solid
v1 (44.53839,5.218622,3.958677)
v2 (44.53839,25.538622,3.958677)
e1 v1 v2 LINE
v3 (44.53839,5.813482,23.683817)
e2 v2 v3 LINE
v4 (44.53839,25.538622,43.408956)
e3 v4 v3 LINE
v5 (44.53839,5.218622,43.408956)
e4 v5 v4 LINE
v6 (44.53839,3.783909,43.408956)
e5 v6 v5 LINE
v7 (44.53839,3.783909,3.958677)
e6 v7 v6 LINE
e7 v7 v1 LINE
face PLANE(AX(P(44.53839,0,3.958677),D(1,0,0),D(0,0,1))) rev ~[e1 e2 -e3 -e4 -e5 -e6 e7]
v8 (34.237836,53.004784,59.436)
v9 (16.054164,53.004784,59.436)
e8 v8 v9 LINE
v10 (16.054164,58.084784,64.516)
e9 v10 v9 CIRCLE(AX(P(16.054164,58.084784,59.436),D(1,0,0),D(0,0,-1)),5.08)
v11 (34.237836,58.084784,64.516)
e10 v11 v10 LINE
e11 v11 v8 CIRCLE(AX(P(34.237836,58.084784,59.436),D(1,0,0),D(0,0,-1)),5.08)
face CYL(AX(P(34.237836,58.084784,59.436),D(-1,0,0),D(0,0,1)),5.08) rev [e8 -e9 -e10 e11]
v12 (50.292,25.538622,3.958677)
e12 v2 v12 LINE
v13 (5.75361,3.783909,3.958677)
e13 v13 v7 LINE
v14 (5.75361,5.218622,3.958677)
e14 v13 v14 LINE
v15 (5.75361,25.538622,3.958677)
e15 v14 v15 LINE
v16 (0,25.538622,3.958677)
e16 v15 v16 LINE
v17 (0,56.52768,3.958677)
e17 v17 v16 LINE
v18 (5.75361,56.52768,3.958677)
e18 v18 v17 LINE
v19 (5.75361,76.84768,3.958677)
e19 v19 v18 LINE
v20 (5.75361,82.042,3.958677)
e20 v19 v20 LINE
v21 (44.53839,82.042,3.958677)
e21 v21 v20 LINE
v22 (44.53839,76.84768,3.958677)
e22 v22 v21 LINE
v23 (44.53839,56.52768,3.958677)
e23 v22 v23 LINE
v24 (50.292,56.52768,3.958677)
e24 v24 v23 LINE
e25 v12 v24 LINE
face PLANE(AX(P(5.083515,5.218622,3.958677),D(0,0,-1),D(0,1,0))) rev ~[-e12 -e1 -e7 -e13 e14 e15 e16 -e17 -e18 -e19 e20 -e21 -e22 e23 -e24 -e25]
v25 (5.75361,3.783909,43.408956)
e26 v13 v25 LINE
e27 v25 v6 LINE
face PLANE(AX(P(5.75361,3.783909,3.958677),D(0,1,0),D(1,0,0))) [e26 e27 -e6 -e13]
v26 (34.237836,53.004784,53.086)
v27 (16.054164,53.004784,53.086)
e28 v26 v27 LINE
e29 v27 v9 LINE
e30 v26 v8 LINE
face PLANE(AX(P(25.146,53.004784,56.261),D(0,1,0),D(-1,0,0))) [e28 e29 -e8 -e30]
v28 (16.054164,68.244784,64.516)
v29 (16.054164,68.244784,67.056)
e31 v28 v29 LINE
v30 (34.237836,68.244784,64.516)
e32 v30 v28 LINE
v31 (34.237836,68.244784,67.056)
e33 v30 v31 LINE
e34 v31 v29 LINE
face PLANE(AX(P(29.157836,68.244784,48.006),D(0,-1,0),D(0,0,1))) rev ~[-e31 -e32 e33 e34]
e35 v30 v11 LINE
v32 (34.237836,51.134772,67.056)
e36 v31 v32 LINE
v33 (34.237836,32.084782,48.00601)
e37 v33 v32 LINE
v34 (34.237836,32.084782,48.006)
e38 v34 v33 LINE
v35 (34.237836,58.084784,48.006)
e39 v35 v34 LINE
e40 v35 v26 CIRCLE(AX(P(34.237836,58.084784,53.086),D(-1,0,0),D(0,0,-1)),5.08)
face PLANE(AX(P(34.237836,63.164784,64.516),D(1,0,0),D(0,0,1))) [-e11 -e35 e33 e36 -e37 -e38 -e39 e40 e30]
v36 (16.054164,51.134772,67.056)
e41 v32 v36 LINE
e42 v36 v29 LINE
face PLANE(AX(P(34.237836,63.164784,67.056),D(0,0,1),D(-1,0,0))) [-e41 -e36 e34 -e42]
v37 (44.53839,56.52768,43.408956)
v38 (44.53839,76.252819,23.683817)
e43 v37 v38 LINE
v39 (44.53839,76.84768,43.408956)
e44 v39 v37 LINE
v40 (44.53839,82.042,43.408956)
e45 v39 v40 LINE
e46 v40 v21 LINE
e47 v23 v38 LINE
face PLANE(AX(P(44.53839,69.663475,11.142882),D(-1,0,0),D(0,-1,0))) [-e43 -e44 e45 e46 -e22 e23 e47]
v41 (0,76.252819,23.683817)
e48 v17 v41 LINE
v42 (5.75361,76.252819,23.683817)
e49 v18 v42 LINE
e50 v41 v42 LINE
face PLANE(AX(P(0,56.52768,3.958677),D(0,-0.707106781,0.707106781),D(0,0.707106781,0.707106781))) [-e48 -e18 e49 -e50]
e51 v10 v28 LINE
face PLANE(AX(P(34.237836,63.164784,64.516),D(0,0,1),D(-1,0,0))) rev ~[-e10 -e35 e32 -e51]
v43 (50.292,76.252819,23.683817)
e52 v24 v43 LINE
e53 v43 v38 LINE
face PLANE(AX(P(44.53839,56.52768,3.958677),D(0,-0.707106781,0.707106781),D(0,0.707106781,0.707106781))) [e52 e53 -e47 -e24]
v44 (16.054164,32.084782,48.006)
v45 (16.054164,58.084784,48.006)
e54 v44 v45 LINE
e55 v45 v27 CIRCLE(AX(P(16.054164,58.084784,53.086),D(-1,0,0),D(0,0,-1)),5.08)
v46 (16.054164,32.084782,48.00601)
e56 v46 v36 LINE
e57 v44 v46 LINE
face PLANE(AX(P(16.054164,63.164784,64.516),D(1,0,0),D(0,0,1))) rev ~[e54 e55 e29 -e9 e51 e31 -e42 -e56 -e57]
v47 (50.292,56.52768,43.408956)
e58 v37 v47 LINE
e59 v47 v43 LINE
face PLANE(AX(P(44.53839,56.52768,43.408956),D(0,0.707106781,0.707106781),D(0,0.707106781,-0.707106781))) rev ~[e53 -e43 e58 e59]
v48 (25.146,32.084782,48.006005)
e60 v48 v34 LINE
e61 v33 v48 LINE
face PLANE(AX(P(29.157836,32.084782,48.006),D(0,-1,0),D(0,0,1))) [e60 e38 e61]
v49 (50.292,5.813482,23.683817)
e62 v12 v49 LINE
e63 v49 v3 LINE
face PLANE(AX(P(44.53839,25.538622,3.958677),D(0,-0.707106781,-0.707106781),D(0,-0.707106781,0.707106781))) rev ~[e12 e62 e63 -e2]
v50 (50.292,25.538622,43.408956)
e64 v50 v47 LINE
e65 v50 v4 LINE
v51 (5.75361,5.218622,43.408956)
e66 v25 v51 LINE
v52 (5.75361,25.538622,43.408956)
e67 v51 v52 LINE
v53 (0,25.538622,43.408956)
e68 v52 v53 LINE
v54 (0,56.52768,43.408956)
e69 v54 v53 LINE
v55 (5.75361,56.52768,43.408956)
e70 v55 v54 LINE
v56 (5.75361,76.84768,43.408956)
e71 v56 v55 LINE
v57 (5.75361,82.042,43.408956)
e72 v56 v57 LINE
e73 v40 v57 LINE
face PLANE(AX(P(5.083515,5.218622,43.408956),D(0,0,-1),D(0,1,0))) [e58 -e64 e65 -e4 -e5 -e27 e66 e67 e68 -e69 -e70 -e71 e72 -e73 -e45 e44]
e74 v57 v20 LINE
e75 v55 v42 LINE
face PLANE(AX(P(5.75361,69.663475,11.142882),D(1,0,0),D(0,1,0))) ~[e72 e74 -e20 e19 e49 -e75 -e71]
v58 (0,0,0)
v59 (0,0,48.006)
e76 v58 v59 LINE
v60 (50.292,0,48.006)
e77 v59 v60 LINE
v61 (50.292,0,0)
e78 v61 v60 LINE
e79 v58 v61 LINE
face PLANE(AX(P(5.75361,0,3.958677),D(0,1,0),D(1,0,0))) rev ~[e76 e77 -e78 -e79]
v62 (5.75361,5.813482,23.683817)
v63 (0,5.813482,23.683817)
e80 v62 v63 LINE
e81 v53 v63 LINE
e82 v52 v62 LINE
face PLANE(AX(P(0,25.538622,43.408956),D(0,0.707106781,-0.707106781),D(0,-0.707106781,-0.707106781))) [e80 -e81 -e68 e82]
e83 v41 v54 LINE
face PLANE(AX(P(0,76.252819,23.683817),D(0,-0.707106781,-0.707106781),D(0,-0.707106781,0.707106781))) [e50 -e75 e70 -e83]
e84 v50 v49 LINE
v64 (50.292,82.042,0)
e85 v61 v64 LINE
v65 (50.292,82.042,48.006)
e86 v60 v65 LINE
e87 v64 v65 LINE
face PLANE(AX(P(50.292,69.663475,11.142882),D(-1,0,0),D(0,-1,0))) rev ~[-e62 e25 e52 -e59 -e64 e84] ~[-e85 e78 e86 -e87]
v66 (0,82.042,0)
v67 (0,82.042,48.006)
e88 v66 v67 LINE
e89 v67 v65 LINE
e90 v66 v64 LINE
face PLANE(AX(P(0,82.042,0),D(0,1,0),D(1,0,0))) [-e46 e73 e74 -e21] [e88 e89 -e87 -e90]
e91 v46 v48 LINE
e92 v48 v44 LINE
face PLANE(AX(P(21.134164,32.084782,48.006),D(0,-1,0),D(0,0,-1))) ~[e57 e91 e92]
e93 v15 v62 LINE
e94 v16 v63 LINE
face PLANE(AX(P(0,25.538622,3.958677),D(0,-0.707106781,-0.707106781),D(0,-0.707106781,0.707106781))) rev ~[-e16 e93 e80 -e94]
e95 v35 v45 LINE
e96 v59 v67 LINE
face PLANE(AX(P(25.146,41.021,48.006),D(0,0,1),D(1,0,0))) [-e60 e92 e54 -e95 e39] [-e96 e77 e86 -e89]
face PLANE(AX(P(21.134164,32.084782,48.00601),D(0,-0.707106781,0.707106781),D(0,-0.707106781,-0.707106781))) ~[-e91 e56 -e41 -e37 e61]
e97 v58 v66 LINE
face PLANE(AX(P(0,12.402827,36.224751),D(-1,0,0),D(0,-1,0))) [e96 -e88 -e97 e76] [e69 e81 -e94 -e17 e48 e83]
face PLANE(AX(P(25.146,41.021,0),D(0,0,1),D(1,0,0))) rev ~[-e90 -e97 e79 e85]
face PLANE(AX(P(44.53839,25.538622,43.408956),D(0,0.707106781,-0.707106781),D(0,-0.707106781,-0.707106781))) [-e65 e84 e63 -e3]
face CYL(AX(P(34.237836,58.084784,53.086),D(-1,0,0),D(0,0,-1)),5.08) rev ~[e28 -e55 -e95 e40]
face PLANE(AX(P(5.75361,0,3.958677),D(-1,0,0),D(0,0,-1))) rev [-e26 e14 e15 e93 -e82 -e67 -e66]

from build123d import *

# Parameters (mm, degrees)
F0_W          = 50.292
F0_H          = 82.042
F1_DEPTH      = 48.006
F2_W          = 39.4548750482
F2_H          = 39.4502789713
F3_DEPTH      = 101.6
F4_W          = 71.629058104
F4_H          = 39.4502789713
F5_DEPTH      = 101.6
F5_DEPTH_BACK = 25.4
F6_T1_DEPTH   = 5.7536101086
F6_T3_DEPTH   = 5.0835148431
F6_T8_DEPTH   = 58.0102084241
F6_T14_DEPTH  = 58.0102084241
F6_T20_DEPTH  = 58.0102084241
F6_T26_DEPTH  = 57.3401131586
F6_T32_DEPTH  = 57.3401131586
F6_T38_DEPTH  = 58.0102084241
F6_T44_DEPTH  = 57.3401131586
F6_T50_DEPTH  = 57.3401131586
F7_W          = 4.0118359902
F7_H          = 8.2200020552
F8_DEPTH      = 19.05
F9_DEPTH      = 12.7
F10_SIZE      = 19.04999
F11_DEPTH     = 5.08
F13_DEPTH     = 10.16
F14_W         = 18.1836719804
F14_H         = 16.51
F15_DEPTH     = 10.16
F16_R         = 5.08
F17_DEPTH     = 5.08
F18_W         = 38.7847797828
F18_H         = 3.7839086726
F19_DEPTH     = 40.64


# Not quite as in the source:
# - a fillet or chamfer that OpenCascade refuses, or shapes differently, is made with other operations: its cross-section is extruded or revolved along the edge and cut away or added
# - a fillet or chamfer is up to 0.001 mm smaller than in the source, because OpenCascade refuses the exact size


with BuildPart() as f1:
    # F0 (on Top) → F1 (new body)
    with BuildSketch(Plane.XY):
        with Locations((25.146, 41.021)):
            Rectangle(F0_W, F0_H)
    extrude(amount=F1_DEPTH)

    # F2 (on face) → F3 (cut)
    with BuildSketch(Plane.XZ):
        with Locations((24.8109523673, 23.683816893)):
            Rectangle(F2_W, F2_H)
    extrude(amount=-F3_DEPTH, mode=Mode.SUBTRACT)

    # F4 (on face) → F5 (cut, two sides)
    with BuildSketch(Plane.YZ.offset(5.0835148431)) as f5_sk:
        with Locations((41.033150861, 23.683816893)):
            Rectangle(F4_W, F4_H)
    extrude(amount=F5_DEPTH, mode=Mode.SUBTRACT)
    extrude(f5_sk.sketch, amount=-F5_DEPTH_BACK, mode=Mode.SUBTRACT)

    # F6: chamfer of 20.32 on 8 edges, made by hand

    # F6_s2 → F6_t1 (join)
    with BuildSketch(Plane.YZ.offset(44.5383898914)):
        Polygon((56.527679913, 3.9586774074), (76.847679913, 24.2786774074), (76.847679913, 3.9586774074), align=None)
        Polygon((25.538621809, 3.9586774074), (5.218621809, 24.2786774074), (5.218621809, 3.9586774074), align=None)
        Polygon((25.538621809, 43.4089563787), (5.218621809, 23.0889563787), (5.218621809, 43.4089563787), align=None)
        Polygon((56.527679913, 43.4089563787), (76.847679913, 23.0889563787), (76.847679913, 43.4089563787), align=None)
    extrude(amount=F6_T1_DEPTH)

    # F6_s4 → F6_t3 (join)
    with BuildSketch(Plane.YZ):
        Polygon((25.538621809, 43.4089563787), (5.218621809, 23.0889563787), (5.218621809, 43.4089563787), align=None)
        Polygon((25.538621809, 3.9586774074), (5.218621809, 24.2786774074), (5.218621809, 3.9586774074), align=None)
        Polygon((76.847679913, 23.0889563787), (56.527679913, 43.4089563787), (76.847679913, 43.4089563787), align=None)
        Polygon((56.527679913, 3.9586774074), (76.847679913, 24.2786774074), (76.847679913, 3.9586774074), align=None)
    extrude(amount=F6_T3_DEPTH)


with BuildPart() as f6_tool6:
    # F6_s7 → F6_t8 (new body)
    with BuildSketch(Plane.YZ.offset(-7.7182084241)):
        Polygon((56.527679913, 3.9586774074), (76.847679913, 24.2786774074), (76.847679913, 3.9586774074), align=None)
    extrude(amount=F6_T8_DEPTH)

    split(bisect_by=Plane.YZ, keep=Keep.TOP)

    split(bisect_by=Plane.YZ.offset(5.0835148431), keep=Keep.BOTTOM)


with BuildPart() as f1_1:
    add(f1.part)

    # F6_t5: union F6_tool6
    add(f6_tool6.part)


with BuildPart() as f6_tool12:
    # F6_s13 → F6_t14 (new body)
    with BuildSketch(Plane.YZ.offset(-7.7182084241)):
        Polygon((25.538621809, 3.9586774074), (5.218621809, 24.2786774074), (5.218621809, 3.9586774074), align=None)
    extrude(amount=F6_T14_DEPTH)

    split(bisect_by=Plane.YZ, keep=Keep.TOP)

    split(bisect_by=Plane.YZ.offset(5.0835148431), keep=Keep.BOTTOM)


with BuildPart() as f1_2:
    add(f1_1.part)

    # F6_t11: union F6_tool12
    add(f6_tool12.part)


with BuildPart() as f6_tool18:
    # F6_s19 → F6_t20 (new body)
    with BuildSketch(Plane.YZ.offset(50.292)):
        Polygon((25.538621809, 43.4089563787), (5.218621809, 23.0889563787), (5.218621809, 43.4089563787), align=None)
    extrude(amount=-F6_T20_DEPTH)

    split(bisect_by=Plane.YZ, keep=Keep.TOP)

    split(bisect_by=Plane.YZ.offset(5.0835148431), keep=Keep.BOTTOM)


with BuildPart() as f1_3:
    add(f1_2.part)

    # F6_t17: union F6_tool18
    add(f6_tool18.part)


with BuildPart() as f6_tool24:
    # F6_s25 → F6_t26 (new body)
    with BuildSketch(Plane.YZ.offset(57.3401131586)):
        Polygon((25.538621809, 43.4089563787), (5.218621809, 23.0889563787), (5.218621809, 43.4089563787), align=None)
    extrude(amount=-F6_T26_DEPTH)

    split(bisect_by=Plane.YZ.offset(50.292), keep=Keep.BOTTOM)

    split(bisect_by=Plane.YZ.offset(44.5383898914), keep=Keep.TOP)


with BuildPart() as f1_4:
    add(f1_3.part)

    # F6_t23: union F6_tool24
    add(f6_tool24.part)


with BuildPart() as f6_tool30:
    # F6_s31 → F6_t32 (new body)
    with BuildSketch(Plane.YZ):
        Polygon((25.538621809, 3.9586774074), (5.218621809, 24.2786774074), (5.218621809, 3.9586774074), align=None)
    extrude(amount=F6_T32_DEPTH)

    split(bisect_by=Plane.YZ.offset(50.292), keep=Keep.BOTTOM)

    split(bisect_by=Plane.YZ.offset(44.5383898914), keep=Keep.TOP)


with BuildPart() as f1_5:
    add(f1_4.part)

    # F6_t29: union F6_tool30
    add(f6_tool30.part)


with BuildPart() as f6_tool36:
    # F6_s37 → F6_t38 (new body)
    with BuildSketch(Plane.YZ.offset(50.292)):
        Polygon((56.527679913, 43.4089563787), (76.847679913, 23.0889563787), (76.847679913, 43.4089563787), align=None)
    extrude(amount=-F6_T38_DEPTH)

    split(bisect_by=Plane.YZ, keep=Keep.TOP)

    split(bisect_by=Plane.YZ.offset(5.0835148431), keep=Keep.BOTTOM)


with BuildPart() as f1_6:
    add(f1_5.part)

    # F6_t35: union F6_tool36
    add(f6_tool36.part)


with BuildPart() as f6_tool42:
    # F6_s43 → F6_t44 (new body)
    with BuildSketch(Plane.YZ.offset(57.3401131586)):
        Polygon((76.847679913, 23.0889563787), (56.527679913, 43.4089563787), (76.847679913, 43.4089563787), align=None)
    extrude(amount=-F6_T44_DEPTH)

    split(bisect_by=Plane.YZ.offset(50.292), keep=Keep.BOTTOM)

    split(bisect_by=Plane.YZ.offset(44.5383898914), keep=Keep.TOP)


with BuildPart() as f1_7:
    add(f1_6.part)

    # F6_t41: union F6_tool42
    add(f6_tool42.part)


with BuildPart() as f6_tool48:
    # F6_s49 → F6_t50 (new body)
    with BuildSketch(Plane.YZ):
        Polygon((56.527679913, 3.9586774074), (76.847679913, 24.2786774074), (76.847679913, 3.9586774074), align=None)
    extrude(amount=F6_T50_DEPTH)

    split(bisect_by=Plane.YZ.offset(50.292), keep=Keep.BOTTOM)

    split(bisect_by=Plane.YZ.offset(44.5383898914), keep=Keep.TOP)


with BuildPart() as f1_8:
    add(f1_7.part)

    # F6_t47: union F6_tool48
    add(f6_tool48.part)

    # F7 (on face) → F8 (join)
    with BuildSketch(Plane.XY.offset(48.006)):
        with Locations((27.1519179951, 36.1947827041)):
            Rectangle(F7_W, F7_H)
    extrude(amount=F8_DEPTH)

    # F9 (add): a face of the model
    f9_faces = [f1_8.faces().sort_by_distance(p)[0] for p in [
        (27.1519179951, 40.3047837317, 57.531),
    ]]
    extrude(f9_faces, amount=F9_DEPTH)

    # F10 (size 19.05 in the source; OpenCascade refuses exactly that, so slightly less here)
    f10_edges = [f1_8.edges().sort_by_distance(p)[0] for p in [
        (27.151918, 32.084782, 67.056),
    ]]
    chamfer(f10_edges, length=F10_SIZE)

    # F11 (add): a face of the model
    f11_faces = [f1_8.faces().sort_by_distance(p)[0] for p in [
        (29.1578359902, 45.9802990729, 54.8770427375),
    ]]
    extrude(f11_faces, amount=F11_DEPTH)

    # F12: F1 across face


with BuildPart() as f1_9:
    add(f1_8.part)
    add(f1_8.part.mirror(Plane(origin=(25.146, 45.9802990729, 54.8770427375), x_dir=(0, -1, 0), z_dir=(-1, 0, 0))))

    # F13 (add): a face of the model
    f13_faces = [f1_9.faces().sort_by_distance(p)[0] for p in [
        (25.146, 53.0047837317, 57.531),
    ]]
    extrude(f13_faces, amount=F13_DEPTH)

    # F14 (on face) → F15 (cut)
    with BuildSketch(Plane(origin=(0, 63.1647837317, 0), x_dir=(-1, 0, 0), z_dir=(0, 1, 0))):
        with Locations((-25.146, 56.261)):
            Rectangle(F14_W, F14_H)
    extrude(amount=-F15_DEPTH, mode=Mode.SUBTRACT)

    # F16
    f16_edges = [f1_9.edges().sort_by_distance(p)[0] for p in [
        (25.146, 53.004784, 64.516),
        (25.146, 53.004784, 48.006),
    ]]
    fillet(f16_edges, radius=F16_R)

    # F17 (add): a face of the model
    f17_faces = [f1_9.faces().sort_by_distance(p)[0] for p in [
        (25.146, 63.1647837317, 65.786),
    ]]
    extrude(f17_faces, amount=F17_DEPTH)

    # F18 (on face) → F19 (join)
    with BuildSketch(Plane.XY.offset(3.9586774074)):
        with Locations((25.146, 1.8919543363)):
            Rectangle(F18_W, F18_H)
    extrude(amount=F19_DEPTH)


solid = f1_9.part
